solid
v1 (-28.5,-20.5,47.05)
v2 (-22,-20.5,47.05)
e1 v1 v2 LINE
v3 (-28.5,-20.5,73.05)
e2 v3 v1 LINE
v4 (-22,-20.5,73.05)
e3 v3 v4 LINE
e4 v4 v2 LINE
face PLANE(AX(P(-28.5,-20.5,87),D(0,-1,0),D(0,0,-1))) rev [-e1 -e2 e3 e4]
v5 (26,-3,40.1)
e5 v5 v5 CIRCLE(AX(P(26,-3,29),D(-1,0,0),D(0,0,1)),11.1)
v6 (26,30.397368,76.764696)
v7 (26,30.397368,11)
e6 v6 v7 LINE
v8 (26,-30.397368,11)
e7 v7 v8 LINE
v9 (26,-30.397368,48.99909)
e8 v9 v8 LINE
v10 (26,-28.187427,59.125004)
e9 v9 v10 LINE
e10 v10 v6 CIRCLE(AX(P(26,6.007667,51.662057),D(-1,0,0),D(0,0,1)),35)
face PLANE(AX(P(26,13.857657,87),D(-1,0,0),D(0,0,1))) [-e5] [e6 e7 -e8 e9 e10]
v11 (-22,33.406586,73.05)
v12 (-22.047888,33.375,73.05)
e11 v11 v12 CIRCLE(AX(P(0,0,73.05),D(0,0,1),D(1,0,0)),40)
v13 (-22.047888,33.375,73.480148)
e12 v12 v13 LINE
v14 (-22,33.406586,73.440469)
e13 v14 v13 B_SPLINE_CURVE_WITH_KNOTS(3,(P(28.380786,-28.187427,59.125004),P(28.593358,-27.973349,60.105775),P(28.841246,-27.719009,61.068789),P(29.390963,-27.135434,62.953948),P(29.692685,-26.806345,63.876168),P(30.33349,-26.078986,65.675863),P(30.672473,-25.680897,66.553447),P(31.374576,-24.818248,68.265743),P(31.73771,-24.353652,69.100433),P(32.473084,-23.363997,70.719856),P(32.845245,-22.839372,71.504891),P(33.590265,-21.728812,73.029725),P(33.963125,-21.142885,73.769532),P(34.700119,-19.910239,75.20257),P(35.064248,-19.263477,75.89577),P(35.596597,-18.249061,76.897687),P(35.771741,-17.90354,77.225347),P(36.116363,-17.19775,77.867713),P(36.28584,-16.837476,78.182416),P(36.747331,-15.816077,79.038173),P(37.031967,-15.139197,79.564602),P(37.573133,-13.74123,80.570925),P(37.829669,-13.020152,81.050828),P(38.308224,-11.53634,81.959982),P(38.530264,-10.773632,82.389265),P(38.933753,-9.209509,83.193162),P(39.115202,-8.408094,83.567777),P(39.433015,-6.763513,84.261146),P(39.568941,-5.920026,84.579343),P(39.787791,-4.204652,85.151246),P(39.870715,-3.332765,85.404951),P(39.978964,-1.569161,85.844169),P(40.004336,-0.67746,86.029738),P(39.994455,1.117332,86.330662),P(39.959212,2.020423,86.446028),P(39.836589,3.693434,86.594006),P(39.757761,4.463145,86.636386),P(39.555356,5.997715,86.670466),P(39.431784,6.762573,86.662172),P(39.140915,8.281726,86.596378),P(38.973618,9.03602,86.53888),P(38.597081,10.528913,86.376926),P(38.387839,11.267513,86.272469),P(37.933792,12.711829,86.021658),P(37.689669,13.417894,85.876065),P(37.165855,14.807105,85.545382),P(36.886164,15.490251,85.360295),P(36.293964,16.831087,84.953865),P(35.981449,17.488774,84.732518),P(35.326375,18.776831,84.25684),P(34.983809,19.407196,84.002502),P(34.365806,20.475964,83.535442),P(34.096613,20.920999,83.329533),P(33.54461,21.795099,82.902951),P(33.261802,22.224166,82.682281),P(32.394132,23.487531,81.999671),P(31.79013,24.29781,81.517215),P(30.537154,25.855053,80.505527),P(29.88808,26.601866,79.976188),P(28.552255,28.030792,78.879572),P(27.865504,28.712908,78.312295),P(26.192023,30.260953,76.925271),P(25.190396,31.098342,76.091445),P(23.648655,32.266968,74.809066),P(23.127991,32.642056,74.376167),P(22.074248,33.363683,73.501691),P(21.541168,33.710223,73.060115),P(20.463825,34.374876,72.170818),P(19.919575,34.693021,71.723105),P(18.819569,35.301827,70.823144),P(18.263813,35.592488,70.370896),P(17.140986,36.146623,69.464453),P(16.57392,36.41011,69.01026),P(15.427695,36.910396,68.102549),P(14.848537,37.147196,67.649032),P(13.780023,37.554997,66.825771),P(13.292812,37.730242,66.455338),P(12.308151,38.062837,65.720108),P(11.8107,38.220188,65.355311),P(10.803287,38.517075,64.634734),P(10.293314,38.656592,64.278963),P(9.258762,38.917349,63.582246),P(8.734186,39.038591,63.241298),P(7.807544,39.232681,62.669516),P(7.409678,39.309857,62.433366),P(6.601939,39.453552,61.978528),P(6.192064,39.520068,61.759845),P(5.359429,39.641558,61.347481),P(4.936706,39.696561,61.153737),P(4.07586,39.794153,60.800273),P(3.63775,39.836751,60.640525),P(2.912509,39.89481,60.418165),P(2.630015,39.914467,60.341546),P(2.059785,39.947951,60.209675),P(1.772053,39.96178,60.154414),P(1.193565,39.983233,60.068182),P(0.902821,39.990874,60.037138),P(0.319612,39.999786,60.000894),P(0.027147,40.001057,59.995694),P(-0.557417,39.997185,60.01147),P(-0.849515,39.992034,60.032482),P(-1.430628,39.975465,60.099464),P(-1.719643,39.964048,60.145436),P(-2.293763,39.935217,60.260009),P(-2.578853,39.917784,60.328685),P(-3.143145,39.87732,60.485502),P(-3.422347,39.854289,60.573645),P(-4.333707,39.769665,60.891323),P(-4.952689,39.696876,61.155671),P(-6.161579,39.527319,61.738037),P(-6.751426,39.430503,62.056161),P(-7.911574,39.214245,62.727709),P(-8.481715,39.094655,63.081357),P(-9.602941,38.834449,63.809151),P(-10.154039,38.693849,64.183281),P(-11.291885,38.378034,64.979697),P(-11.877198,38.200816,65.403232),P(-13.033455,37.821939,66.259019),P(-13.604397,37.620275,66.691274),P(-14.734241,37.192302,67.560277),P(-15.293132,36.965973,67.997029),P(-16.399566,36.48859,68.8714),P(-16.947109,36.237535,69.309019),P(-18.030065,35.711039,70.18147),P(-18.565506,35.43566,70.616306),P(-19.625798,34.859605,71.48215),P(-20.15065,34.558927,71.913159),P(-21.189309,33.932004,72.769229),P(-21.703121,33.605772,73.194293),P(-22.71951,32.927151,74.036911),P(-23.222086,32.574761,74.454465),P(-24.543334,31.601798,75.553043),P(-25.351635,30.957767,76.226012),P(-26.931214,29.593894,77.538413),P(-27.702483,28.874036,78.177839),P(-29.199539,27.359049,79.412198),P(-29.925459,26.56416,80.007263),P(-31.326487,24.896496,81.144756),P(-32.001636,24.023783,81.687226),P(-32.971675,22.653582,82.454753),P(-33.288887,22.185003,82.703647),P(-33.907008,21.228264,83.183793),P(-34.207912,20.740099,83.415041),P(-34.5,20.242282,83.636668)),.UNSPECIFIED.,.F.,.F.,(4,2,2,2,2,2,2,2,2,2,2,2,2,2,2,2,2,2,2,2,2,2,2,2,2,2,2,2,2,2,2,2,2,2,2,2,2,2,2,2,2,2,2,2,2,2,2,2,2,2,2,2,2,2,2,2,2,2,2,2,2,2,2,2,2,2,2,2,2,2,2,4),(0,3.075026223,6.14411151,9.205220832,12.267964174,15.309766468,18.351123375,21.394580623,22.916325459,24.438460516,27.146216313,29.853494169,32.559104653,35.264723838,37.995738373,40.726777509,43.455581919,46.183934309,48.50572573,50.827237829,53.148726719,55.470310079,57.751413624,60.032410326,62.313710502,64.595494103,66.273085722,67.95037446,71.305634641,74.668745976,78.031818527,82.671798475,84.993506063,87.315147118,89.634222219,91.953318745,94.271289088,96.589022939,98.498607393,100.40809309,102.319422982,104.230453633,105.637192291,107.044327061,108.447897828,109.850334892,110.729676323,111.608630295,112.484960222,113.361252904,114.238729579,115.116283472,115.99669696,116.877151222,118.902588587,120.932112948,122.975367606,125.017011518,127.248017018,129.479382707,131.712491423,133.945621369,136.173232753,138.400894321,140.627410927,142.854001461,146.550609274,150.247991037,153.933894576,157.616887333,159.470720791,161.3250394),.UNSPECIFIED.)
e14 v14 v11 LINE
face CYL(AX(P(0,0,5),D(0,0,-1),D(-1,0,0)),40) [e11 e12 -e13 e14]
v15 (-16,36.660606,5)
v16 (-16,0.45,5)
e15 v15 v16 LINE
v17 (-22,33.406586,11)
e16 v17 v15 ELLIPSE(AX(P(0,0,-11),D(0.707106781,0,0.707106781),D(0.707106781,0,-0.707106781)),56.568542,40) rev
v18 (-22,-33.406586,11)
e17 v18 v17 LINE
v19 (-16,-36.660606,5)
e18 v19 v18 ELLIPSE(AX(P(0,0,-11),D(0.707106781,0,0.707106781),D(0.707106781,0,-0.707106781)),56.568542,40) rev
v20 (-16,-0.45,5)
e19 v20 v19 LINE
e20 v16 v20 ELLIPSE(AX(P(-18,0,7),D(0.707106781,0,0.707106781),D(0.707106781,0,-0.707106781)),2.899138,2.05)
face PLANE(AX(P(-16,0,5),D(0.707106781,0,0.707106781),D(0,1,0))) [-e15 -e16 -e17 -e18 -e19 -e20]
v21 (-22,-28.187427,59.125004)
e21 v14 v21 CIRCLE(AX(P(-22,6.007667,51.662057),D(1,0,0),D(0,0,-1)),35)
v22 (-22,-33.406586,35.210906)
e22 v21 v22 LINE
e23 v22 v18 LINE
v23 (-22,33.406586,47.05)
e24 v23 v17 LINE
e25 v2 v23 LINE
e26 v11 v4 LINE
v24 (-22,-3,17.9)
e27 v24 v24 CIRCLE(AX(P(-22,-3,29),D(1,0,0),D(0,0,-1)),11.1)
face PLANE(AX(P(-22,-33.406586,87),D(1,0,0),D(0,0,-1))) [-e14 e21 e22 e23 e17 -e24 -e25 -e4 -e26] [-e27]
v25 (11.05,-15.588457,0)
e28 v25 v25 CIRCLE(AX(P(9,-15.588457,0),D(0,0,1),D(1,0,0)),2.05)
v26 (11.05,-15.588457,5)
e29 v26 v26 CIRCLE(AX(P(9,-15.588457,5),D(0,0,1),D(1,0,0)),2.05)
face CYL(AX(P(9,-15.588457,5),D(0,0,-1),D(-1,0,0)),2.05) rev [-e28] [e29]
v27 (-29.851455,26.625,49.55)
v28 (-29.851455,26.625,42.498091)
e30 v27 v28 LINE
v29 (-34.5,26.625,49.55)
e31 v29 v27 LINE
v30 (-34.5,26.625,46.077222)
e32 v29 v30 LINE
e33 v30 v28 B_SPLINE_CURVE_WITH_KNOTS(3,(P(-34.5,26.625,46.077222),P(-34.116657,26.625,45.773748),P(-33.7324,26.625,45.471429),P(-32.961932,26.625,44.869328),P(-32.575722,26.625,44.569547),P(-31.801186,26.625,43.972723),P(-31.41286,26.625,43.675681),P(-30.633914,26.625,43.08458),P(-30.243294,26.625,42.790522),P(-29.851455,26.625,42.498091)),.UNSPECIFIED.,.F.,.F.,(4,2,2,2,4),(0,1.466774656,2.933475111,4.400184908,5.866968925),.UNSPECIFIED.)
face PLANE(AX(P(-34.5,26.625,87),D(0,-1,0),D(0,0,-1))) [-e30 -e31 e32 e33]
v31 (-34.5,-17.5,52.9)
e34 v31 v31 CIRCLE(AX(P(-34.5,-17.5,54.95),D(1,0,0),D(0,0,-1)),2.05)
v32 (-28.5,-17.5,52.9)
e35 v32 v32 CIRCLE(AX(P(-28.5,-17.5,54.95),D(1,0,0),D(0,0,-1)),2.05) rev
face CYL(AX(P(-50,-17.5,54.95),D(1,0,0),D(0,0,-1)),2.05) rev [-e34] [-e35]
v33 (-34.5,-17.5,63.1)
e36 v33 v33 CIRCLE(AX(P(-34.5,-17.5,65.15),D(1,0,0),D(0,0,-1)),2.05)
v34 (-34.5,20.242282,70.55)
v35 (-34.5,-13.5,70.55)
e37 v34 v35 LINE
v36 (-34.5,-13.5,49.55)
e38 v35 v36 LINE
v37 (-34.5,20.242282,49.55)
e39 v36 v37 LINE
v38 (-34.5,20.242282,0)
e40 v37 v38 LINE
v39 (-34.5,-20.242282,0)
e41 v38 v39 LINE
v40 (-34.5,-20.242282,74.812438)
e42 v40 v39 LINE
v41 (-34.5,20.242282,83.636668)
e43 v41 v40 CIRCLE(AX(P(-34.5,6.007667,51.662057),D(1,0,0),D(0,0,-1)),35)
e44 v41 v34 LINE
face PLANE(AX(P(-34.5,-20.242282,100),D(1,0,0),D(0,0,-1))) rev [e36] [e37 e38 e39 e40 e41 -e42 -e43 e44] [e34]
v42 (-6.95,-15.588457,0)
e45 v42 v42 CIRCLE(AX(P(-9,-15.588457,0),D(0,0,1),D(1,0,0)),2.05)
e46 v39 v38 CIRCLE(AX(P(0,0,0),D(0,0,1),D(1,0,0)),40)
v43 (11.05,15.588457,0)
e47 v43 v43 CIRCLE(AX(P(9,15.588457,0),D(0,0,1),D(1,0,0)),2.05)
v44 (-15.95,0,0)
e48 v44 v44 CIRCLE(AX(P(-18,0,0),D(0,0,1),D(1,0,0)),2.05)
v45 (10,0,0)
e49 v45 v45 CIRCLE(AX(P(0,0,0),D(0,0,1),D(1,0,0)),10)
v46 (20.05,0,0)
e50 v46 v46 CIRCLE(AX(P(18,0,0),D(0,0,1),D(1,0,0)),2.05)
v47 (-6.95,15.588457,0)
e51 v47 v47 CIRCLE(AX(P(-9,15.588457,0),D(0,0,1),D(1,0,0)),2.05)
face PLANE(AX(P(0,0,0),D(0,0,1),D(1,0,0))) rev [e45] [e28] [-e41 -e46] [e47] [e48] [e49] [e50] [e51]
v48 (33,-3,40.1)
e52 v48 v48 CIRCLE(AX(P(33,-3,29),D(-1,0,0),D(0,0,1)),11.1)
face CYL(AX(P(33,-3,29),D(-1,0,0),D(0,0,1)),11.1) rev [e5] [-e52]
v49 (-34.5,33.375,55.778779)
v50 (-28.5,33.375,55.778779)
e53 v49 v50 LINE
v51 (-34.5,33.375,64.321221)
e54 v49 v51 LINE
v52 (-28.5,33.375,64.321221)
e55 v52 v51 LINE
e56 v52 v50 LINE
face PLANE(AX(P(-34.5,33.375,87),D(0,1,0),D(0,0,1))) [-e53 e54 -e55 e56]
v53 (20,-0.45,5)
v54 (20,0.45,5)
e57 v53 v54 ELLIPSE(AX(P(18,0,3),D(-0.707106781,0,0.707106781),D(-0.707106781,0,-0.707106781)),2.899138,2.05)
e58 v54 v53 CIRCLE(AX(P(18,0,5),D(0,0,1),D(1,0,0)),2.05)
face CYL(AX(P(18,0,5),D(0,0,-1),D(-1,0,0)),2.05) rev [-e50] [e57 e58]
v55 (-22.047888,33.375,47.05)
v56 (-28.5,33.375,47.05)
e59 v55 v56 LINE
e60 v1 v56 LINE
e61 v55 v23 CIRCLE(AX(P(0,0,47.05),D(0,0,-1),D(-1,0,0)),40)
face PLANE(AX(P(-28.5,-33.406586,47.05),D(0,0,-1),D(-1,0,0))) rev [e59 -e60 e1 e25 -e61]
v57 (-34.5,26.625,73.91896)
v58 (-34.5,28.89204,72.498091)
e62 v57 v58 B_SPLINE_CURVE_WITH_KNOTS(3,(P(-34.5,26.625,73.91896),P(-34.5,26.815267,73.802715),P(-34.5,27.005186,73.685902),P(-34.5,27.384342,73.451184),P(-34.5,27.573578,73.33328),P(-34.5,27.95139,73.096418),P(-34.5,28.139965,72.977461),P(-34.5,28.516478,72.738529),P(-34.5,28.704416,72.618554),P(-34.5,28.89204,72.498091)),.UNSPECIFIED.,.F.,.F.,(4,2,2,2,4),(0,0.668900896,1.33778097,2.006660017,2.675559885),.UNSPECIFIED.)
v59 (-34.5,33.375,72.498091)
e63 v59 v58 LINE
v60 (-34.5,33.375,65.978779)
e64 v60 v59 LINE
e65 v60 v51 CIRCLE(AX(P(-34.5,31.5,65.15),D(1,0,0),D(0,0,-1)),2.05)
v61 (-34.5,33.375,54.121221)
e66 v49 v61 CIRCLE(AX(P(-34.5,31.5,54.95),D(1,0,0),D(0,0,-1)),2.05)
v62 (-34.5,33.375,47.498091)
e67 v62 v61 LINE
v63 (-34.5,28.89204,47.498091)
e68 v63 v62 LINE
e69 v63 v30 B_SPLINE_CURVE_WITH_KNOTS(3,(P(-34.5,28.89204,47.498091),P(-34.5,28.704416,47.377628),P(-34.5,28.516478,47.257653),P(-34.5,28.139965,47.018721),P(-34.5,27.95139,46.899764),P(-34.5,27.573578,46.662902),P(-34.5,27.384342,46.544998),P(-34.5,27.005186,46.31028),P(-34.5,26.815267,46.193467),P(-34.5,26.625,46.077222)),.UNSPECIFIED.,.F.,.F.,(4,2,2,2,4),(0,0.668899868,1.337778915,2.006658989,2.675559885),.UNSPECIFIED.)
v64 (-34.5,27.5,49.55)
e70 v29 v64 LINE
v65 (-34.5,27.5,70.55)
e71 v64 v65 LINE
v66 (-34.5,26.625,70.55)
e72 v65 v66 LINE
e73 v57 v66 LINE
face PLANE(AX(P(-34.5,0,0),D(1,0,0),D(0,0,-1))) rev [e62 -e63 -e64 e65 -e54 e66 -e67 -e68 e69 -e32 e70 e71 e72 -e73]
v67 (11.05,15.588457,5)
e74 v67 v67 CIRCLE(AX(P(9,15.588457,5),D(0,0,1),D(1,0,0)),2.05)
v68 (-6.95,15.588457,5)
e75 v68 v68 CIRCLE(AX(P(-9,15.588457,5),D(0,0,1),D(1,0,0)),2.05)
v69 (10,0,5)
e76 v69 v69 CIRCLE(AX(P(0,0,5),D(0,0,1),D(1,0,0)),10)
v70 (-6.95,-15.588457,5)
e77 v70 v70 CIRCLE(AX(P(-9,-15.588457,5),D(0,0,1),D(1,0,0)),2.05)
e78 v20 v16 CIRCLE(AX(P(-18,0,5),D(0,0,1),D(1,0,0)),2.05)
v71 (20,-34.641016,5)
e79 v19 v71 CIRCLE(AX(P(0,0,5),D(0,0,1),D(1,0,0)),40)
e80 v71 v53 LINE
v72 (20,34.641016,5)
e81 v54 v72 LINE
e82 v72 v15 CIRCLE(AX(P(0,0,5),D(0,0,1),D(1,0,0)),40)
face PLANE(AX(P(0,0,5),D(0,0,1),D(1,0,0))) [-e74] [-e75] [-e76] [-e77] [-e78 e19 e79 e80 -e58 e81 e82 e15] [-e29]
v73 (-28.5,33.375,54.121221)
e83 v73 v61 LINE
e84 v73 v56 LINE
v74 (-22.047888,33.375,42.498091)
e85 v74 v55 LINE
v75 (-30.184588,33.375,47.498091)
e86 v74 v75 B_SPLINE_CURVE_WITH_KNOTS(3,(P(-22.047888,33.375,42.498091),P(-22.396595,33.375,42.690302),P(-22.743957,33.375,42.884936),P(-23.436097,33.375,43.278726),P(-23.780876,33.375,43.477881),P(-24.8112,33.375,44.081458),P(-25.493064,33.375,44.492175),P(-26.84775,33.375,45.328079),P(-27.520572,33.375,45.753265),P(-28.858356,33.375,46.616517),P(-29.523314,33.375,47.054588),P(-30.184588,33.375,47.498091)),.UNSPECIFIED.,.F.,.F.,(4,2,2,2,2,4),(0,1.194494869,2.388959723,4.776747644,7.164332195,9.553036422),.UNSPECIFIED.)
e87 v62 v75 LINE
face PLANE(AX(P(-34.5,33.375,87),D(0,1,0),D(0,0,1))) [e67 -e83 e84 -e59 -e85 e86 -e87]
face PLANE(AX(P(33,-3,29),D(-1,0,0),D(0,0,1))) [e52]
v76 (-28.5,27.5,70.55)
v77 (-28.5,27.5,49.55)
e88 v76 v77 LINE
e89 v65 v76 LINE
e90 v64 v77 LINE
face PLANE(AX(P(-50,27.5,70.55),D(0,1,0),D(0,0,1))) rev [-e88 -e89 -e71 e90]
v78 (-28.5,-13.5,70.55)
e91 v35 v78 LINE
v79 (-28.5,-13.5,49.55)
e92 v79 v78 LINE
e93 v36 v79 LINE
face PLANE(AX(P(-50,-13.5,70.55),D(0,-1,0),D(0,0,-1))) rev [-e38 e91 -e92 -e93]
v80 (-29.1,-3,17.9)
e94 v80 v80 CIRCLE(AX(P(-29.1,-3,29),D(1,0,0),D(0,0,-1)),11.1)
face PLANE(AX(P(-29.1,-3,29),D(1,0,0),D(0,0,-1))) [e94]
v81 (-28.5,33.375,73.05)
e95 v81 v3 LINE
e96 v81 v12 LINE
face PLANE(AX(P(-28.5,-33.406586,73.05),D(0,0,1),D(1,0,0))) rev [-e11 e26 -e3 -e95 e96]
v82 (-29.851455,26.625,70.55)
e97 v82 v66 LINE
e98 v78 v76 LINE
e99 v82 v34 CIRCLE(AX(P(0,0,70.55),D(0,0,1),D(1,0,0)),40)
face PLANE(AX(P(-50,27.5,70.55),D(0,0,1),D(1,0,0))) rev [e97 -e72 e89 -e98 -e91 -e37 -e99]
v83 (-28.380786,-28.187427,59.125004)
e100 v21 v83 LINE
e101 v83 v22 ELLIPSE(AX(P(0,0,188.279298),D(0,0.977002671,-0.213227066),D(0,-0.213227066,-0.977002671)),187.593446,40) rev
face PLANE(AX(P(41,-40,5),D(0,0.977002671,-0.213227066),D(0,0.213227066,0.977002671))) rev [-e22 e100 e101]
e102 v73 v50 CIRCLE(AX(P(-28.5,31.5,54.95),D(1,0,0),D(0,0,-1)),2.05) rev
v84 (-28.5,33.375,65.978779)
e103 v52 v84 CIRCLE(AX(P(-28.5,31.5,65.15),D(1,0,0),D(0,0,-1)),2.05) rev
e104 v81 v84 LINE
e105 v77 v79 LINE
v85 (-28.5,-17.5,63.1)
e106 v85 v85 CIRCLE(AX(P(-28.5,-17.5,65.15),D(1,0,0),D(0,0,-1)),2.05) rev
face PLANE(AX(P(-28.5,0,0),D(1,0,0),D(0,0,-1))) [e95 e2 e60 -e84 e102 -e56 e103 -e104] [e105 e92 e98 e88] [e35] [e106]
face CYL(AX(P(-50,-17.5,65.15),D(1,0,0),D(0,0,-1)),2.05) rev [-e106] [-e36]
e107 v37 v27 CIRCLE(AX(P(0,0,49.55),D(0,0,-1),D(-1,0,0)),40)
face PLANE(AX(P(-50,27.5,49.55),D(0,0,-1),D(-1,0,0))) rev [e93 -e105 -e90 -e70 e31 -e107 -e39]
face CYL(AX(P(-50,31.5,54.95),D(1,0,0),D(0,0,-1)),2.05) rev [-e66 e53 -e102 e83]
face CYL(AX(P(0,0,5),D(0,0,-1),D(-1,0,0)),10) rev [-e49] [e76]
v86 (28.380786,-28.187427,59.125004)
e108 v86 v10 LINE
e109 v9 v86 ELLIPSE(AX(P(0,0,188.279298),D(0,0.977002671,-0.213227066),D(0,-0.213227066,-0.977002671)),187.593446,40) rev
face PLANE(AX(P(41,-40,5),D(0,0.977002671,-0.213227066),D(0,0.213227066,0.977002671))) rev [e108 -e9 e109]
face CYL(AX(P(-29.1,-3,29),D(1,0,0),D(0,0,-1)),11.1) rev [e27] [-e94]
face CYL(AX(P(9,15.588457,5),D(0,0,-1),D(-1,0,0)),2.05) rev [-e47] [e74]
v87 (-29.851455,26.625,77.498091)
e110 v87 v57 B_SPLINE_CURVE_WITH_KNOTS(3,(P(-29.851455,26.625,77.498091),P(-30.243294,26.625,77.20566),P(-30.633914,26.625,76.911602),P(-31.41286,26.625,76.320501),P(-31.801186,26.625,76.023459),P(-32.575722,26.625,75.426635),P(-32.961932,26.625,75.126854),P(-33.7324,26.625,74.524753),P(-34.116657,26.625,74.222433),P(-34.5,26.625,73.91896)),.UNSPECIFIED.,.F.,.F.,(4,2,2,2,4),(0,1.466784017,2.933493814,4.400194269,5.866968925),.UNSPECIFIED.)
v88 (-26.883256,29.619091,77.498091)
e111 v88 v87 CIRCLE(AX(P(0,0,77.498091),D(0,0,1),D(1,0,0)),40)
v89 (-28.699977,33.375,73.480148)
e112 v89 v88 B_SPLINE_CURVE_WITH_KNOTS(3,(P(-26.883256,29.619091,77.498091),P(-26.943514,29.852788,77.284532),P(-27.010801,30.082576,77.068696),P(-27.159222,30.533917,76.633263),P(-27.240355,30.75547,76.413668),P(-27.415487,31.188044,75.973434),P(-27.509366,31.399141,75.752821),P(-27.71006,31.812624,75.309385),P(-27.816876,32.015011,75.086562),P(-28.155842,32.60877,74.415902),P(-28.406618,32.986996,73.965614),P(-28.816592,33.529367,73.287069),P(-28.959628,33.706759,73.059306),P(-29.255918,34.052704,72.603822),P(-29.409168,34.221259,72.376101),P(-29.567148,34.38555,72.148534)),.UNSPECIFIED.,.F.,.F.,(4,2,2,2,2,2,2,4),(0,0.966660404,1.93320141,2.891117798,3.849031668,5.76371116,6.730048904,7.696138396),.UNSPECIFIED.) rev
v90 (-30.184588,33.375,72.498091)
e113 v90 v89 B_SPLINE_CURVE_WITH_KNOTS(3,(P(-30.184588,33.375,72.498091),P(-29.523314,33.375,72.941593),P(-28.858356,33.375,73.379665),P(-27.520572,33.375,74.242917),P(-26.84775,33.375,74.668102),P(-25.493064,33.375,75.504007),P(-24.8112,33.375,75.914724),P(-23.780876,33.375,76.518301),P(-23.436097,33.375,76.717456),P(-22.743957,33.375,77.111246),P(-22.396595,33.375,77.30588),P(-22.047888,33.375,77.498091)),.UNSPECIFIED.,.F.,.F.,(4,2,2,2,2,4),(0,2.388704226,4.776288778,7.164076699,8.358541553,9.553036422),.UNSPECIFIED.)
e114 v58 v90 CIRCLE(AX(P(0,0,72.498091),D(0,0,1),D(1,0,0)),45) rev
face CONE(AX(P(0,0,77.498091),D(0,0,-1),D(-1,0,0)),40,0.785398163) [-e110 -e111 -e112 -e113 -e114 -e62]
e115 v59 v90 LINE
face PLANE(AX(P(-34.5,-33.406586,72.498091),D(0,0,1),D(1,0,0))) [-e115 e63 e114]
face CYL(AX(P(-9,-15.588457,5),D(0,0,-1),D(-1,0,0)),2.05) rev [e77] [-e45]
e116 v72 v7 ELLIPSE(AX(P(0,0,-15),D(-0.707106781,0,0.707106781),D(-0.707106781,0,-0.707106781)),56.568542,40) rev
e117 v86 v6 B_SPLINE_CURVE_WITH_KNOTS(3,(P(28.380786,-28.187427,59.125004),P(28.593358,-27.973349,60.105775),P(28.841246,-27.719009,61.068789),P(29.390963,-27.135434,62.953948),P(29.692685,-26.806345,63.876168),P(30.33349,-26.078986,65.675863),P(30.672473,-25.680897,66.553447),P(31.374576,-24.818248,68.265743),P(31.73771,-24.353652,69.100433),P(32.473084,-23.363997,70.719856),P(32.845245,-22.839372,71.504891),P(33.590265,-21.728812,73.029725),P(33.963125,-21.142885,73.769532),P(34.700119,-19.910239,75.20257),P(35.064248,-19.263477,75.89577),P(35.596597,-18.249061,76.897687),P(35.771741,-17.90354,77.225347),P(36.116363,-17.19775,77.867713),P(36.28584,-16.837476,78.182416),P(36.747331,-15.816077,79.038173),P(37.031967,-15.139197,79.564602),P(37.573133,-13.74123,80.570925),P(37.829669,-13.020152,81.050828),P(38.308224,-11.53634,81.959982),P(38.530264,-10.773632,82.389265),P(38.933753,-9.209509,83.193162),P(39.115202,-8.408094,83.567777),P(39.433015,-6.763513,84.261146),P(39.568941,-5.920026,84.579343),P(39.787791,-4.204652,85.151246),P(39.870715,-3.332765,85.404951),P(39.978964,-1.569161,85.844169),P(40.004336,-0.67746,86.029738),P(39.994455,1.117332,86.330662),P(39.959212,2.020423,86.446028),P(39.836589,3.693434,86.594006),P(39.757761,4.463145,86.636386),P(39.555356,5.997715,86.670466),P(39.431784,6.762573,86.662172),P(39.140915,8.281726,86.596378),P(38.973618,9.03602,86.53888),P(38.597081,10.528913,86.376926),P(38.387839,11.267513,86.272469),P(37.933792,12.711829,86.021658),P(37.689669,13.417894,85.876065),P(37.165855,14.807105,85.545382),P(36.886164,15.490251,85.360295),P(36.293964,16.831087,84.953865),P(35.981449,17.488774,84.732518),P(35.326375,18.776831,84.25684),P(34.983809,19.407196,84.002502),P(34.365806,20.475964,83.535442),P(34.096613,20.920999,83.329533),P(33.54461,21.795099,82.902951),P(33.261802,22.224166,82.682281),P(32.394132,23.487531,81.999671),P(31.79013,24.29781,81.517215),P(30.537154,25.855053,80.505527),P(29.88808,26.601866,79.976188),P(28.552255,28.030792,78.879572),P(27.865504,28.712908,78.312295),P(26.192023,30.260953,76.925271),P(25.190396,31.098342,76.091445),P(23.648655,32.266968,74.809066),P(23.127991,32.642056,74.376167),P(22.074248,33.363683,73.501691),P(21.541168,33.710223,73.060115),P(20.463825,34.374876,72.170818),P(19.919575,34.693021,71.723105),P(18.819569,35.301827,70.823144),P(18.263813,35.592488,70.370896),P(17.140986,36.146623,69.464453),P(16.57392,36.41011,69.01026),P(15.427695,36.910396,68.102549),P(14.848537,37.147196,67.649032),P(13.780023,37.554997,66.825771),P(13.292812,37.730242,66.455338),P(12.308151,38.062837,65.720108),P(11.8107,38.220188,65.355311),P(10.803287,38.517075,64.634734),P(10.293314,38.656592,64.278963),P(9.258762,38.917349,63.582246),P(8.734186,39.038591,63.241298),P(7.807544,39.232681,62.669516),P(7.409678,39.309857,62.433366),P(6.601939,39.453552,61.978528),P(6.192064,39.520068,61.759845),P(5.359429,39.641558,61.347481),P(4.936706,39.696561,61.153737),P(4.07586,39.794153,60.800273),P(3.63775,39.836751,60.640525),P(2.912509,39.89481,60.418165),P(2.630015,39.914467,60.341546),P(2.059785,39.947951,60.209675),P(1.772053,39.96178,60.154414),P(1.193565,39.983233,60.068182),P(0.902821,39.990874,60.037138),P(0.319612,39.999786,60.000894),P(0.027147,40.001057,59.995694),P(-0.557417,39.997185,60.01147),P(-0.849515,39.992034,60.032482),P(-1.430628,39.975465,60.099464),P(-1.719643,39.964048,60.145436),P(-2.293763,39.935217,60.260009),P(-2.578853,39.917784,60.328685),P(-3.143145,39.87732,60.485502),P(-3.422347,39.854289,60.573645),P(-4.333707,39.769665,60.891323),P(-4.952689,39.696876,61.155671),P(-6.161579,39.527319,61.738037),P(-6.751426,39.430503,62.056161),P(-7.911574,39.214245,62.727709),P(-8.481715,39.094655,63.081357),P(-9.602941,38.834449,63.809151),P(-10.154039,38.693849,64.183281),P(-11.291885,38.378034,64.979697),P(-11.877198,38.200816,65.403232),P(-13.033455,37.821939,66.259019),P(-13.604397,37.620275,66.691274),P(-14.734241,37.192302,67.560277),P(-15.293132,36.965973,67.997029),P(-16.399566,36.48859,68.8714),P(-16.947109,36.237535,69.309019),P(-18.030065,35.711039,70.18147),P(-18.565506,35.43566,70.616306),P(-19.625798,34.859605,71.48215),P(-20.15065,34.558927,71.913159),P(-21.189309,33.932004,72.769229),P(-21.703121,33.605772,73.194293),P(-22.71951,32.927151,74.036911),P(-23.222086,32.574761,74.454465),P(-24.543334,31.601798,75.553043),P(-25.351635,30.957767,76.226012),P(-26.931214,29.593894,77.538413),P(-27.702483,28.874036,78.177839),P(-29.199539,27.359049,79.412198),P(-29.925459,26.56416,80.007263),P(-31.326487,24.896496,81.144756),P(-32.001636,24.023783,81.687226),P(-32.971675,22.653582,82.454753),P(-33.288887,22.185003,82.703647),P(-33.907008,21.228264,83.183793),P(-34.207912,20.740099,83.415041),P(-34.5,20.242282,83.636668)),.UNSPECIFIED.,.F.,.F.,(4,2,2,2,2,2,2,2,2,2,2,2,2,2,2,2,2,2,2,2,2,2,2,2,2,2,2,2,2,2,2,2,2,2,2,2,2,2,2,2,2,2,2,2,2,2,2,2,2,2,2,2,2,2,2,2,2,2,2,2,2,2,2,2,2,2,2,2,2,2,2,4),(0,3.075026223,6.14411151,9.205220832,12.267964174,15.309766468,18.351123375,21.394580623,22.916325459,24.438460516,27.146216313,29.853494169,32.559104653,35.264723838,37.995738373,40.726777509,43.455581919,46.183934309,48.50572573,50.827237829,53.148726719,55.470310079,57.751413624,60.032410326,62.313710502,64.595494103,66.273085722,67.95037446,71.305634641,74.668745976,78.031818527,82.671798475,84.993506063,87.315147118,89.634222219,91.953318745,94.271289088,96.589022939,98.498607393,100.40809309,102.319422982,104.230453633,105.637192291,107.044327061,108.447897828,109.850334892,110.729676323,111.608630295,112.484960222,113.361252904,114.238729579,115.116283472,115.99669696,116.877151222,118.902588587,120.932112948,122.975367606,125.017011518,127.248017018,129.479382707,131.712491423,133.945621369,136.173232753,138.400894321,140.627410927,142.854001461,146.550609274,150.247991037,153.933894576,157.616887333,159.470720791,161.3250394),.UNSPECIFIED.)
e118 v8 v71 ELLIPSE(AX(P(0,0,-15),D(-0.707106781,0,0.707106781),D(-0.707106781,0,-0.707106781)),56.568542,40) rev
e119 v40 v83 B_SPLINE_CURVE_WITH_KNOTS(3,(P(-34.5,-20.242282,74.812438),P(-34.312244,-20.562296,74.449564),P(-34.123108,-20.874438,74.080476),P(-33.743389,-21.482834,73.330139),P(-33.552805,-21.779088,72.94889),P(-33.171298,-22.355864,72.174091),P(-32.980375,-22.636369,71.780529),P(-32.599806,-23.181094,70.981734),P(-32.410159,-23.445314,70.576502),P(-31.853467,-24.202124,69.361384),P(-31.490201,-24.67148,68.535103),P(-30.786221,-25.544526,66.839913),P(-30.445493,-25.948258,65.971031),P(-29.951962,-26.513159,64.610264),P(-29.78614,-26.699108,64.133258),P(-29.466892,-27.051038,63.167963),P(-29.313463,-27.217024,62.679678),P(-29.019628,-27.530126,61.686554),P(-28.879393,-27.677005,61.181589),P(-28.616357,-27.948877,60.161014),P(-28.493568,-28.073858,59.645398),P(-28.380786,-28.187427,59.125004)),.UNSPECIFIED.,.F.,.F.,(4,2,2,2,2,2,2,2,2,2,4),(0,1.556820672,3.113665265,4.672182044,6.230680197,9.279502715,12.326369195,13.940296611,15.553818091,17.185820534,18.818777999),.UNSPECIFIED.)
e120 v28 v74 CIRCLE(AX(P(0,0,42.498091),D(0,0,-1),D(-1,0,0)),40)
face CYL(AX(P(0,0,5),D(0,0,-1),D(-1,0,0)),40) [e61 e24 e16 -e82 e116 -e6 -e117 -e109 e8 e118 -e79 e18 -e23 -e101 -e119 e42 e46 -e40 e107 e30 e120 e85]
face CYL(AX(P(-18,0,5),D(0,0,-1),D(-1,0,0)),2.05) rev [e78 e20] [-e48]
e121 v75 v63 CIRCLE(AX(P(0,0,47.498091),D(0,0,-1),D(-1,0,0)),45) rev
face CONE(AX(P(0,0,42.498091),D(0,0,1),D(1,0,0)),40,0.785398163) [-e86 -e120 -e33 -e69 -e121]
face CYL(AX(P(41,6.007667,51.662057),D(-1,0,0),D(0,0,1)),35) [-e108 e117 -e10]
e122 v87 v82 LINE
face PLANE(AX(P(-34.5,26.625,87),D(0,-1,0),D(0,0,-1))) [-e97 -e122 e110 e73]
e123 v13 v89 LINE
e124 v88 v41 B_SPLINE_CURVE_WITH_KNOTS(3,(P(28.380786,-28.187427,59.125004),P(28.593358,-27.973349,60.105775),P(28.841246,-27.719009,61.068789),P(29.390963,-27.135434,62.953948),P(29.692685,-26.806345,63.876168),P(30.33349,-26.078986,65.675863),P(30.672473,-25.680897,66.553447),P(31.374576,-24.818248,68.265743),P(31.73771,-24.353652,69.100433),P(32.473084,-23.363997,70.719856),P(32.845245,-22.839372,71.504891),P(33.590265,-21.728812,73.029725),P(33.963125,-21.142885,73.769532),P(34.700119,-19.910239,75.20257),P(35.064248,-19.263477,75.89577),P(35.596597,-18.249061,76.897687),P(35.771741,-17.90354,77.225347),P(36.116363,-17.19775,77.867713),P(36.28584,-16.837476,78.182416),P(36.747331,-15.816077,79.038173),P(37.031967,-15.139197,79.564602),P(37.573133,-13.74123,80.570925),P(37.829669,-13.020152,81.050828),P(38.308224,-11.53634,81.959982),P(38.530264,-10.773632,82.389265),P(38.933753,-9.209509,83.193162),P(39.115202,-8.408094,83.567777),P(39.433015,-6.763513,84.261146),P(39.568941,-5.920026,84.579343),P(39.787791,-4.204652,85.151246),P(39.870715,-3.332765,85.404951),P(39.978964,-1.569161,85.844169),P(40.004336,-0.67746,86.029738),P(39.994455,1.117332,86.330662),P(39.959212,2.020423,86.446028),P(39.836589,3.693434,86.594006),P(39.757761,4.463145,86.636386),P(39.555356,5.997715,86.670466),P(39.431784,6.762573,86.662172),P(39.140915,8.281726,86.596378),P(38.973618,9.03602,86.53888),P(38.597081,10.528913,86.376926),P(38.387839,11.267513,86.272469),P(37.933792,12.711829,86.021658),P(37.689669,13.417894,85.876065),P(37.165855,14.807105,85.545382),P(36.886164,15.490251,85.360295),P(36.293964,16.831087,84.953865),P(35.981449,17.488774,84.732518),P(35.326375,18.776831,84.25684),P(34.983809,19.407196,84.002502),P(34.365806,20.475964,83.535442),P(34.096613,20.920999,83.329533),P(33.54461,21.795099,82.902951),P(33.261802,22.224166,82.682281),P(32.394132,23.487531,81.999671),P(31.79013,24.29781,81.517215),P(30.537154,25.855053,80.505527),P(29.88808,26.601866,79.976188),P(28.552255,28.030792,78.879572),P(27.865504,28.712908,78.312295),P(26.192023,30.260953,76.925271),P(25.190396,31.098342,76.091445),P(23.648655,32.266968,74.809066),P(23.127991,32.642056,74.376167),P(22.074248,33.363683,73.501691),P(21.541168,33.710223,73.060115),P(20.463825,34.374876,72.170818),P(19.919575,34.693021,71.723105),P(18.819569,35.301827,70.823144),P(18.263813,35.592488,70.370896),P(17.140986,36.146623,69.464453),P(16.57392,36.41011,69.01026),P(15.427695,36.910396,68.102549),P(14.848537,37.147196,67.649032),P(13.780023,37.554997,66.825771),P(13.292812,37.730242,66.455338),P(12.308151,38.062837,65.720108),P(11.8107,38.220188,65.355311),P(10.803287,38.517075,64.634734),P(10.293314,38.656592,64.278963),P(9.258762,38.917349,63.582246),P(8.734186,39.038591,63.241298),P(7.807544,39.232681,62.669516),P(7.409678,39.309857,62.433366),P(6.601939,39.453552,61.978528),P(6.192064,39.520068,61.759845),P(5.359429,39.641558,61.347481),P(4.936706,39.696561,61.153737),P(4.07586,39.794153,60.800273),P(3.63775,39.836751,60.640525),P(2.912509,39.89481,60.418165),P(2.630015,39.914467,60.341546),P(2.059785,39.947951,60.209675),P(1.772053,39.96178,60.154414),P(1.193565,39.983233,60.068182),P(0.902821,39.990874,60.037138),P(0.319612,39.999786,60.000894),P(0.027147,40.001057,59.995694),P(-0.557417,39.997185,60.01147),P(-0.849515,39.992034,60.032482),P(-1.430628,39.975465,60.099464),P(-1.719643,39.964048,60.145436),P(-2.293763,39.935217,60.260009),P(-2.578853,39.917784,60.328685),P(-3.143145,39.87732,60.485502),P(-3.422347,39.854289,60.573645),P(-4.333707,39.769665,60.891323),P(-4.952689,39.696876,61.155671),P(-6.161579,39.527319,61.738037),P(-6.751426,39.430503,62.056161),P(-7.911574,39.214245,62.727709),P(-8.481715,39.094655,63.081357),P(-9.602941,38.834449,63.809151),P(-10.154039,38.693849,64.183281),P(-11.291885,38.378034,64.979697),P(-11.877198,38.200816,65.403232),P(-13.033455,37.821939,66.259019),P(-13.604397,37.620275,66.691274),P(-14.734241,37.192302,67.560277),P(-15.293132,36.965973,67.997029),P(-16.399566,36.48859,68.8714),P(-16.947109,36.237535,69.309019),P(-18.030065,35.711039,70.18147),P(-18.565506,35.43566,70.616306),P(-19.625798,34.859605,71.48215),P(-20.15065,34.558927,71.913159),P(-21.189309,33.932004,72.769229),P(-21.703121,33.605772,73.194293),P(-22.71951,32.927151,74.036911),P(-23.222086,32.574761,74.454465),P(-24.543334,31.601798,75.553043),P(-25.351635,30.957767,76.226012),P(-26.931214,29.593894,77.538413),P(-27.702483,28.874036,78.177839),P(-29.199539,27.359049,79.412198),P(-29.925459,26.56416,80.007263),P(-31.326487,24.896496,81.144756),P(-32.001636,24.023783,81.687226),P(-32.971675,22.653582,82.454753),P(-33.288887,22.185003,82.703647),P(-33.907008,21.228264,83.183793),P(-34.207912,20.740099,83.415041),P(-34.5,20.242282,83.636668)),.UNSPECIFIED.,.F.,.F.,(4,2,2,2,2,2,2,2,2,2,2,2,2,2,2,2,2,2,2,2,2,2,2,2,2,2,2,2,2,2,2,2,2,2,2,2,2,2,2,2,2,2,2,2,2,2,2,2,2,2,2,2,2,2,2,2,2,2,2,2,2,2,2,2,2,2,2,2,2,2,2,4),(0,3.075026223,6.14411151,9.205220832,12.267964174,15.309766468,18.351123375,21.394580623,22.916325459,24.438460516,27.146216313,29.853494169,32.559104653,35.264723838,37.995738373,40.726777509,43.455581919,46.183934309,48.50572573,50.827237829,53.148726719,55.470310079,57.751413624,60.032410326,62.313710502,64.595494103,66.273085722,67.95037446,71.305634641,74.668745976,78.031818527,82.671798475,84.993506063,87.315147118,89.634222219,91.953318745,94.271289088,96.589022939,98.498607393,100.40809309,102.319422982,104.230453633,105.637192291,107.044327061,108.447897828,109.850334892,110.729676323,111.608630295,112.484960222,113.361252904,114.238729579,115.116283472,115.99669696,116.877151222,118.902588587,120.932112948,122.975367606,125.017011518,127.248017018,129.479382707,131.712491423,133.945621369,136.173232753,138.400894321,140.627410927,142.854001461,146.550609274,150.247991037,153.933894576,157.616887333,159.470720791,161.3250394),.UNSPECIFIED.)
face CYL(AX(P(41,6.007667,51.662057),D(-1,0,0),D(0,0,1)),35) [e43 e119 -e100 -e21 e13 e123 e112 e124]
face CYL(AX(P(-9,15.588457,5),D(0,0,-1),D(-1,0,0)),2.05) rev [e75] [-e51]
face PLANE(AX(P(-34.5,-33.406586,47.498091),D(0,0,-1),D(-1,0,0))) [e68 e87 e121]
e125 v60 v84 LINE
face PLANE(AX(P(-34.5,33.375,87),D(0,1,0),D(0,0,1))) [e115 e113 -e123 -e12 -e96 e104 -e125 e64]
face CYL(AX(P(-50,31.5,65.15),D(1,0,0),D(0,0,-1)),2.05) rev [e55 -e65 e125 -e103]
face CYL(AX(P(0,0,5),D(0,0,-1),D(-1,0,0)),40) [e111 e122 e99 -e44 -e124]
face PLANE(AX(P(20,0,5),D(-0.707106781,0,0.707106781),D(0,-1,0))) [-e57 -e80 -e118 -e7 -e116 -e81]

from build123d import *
from build123d.topology import SkipClean

# Parameters (mm, degrees)
SKETCH3_R           = 40
SKETCH3_R_2         = 2.05
SKETCH3_R_3         = 10
BOSS_EXTRUDE1_DEPTH = 5
BOSS_EXTRUDE2_DEPTH = 41
SKETCH5_W           = 112.43258682
SKETCH5_H           = 89.925085182
CUT_EXTRUDE1_DEPTH  = 100
CUT_EXTRUDE2_START  = 5
CUT_EXTRUDE2_DEPTH  = 82
CUT_EXTRUDE3_START  = -22
SKETCH7_R           = 11.1
CUT_EXTRUDE3_DEPTH  = 7.1
BOSS_EXTRUDE3_START = -22
SKETCH9_W           = 6.75
SKETCH9_H           = 25
BOSS_EXTRUDE3_DEPTH = 12.5
SKETCH8_R           = 2.05
SKETCH8_W           = 41
SKETCH8_H           = 21
CUT_EXTRUDE5_DEPTH  = 50
CHAMFER1_SIZE       = 5
CHAMFER2_SIZE       = 6
CUT_EXTRUDE6_START  = 33
SKETCH10_R          = 11.1
CUT_EXTRUDE6_DEPTH  = 7
CUT_EXTRUDE7_START  = -22
SKETCH11_W          = 55
SKETCH11_H          = 26
CUT_EXTRUDE7_DEPTH  = 6.5


with BuildPart() as part:
    # Sketch3 → Boss-Extrude1 (new body)
    with BuildSketch(Plane(origin=(0, 0, 0), x_dir=(0, 1, 0), z_dir=(0, 0, 1))):
        with Locations(Location((0, 0, 0), (0, 0, 270))):
            Circle(SKETCH3_R)
        with Locations(Location((0, 18, 0), (0, 0, 270))):
            Circle(SKETCH3_R_2, mode=Mode.SUBTRACT)
        with Locations(Location((15.588457268, 9, 0), (0, 0, 270))):
            Circle(SKETCH3_R_2, mode=Mode.SUBTRACT)
        with Locations(Location((15.588457268, -9, 0), (0, 0, 270))):
            Circle(SKETCH3_R_2, mode=Mode.SUBTRACT)
        with Locations(Location((0, -18, 0), (0, 0, 270))):
            Circle(SKETCH3_R_2, mode=Mode.SUBTRACT)
        with Locations(Location((-15.588457268, -9, 0), (0, 0, 270))):
            Circle(SKETCH3_R_2, mode=Mode.SUBTRACT)
        with Locations(Location((-15.588457268, 9, 0), (0, 0, 270))):
            Circle(SKETCH3_R_2, mode=Mode.SUBTRACT)
        with Locations(Location((0, 0, 0), (0, 0, 270))):
            Circle(SKETCH3_R_3, mode=Mode.SUBTRACT)
    extrude(amount=BOSS_EXTRUDE1_DEPTH)

    # Sketch4 → Boss-Extrude2 (add, symmetric)
    with BuildSketch(Plane.YZ):
        with BuildLine():
            Line((-40, 5), (-28.187426516, 59.125004254))
            ThreePointArc((-28.187426516, 59.125004254), (5.55857639, 86.659175658), (40, 60))
            Line((40, 60), (40, 5))
            Line((40, 5), (-40, 5))
        make_face()
    extrude(amount=BOSS_EXTRUDE2_DEPTH, both=True)

    # Sketch5 → Cut-Extrude1 (cut)
    with SkipClean():  # the faces are left unmerged after this step: merging them gives an invalid solid
        with BuildSketch(Plane(origin=(0, 0, 0), x_dir=(0, 1, 0), z_dir=(0, 0, 1))):
            Rectangle(SKETCH5_W, SKETCH5_H)
            with BuildLine():
                Line((-20.24228248, 34.5), (20.24228248, 34.5))
                ThreePointArc((20.24228248, 34.5), (0, -40), (-20.24228248, 34.5))
            make_face(mode=Mode.SUBTRACT)
        extrude(amount=CUT_EXTRUDE1_DEPTH, mode=Mode.SUBTRACT)
    add(part.part.scale(1), mode=Mode.REPLACE)  # the faces are merged on a copy

    # Sketch6 → Cut-Extrude2 (cut)
    with BuildSketch(Plane(origin=(0, 0, 0), x_dir=(0, 1, 0), z_dir=(0, 0, 1)).offset(CUT_EXTRUDE2_START)):
        with BuildLine():
            Line((-13.85765721, -26), (13.85765721, -26))
            Line((13.85765721, -26), (30.397368307, -26))
            ThreePointArc((30.397368307, -26), (39.921625117, -2.502768077), (33.406586177, 22))
            Line((33.406586177, 22), (-33.406586177, 22))
            ThreePointArc((-33.406586177, 22), (-39.921625117, -2.502768077), (-30.397368307, -26))
            Line((-30.397368307, -26), (-13.85765721, -26))
        make_face()
        with BuildLine():
            Line((-20.24228248, 34.5), (20.24228248, 34.5))
            ThreePointArc((20.24228248, 34.5), (0, 40), (-20.24228248, 34.5))
        make_face()
    extrude(amount=CUT_EXTRUDE2_DEPTH, mode=Mode.SUBTRACT)

    # Sketch7 → Cut-Extrude3 (cut)
    with BuildSketch(Plane.YZ.offset(CUT_EXTRUDE3_START)):
        with Locations(Location((-3, 29, 0), (0, 0, 270))):
            Circle(SKETCH7_R)
    extrude(amount=-CUT_EXTRUDE3_DEPTH, mode=Mode.SUBTRACT)

    # Sketch9 → Boss-Extrude3 (add)
    with BuildSketch(Plane.YZ.offset(BOSS_EXTRUDE3_START)):
        with Locations((30, 59.998090913)):
            Rectangle(SKETCH9_W, SKETCH9_H)
    extrude(amount=-BOSS_EXTRUDE3_DEPTH)

    # Sketch8 → Cut-Extrude5 (cut)
    with BuildSketch(Plane.YZ):
        with Locations(Location((-17.5, 65.15, 0), (0, 0, 270))):
            Circle(SKETCH8_R)
        with Locations(Location((-17.5, 54.95, 0), (0, 0, 270))):
            Circle(SKETCH8_R)
        with Locations((31.5, 54.95)):
            Circle(SKETCH8_R)
        with Locations((31.5, 65.15)):
            Circle(SKETCH8_R)
        with Locations((7, 60.05)):
            Rectangle(SKETCH8_W, SKETCH8_H)
    extrude(amount=-CUT_EXTRUDE5_DEPTH, mode=Mode.SUBTRACT)

    # Chamfer1
    # the kernel refuses this chamfer: 5 mm, written as the material it adds along each edge
    with BuildSketch(Plane(origin=(0, 0, 72.498090913), x_dir=(-0.9183651186253444, 0.39573413915437844, 0), z_dir=(-0.39573413915437844, -0.9183651186253444, 0))) as chamfer1_piece_1_section:
        Polygon((40, -CHAMFER1_SIZE), (40 + CHAMFER1_SIZE, 0), (40, 0), align=None)
    chamfer1_piece_1 = revolve(axis=Axis((0, 0, 72.498090913), (0, 0, -1)), revolution_arc=51.657569858, mode=Mode.PRIVATE)
    chamfer1_piece_1 = split(chamfer1_piece_1, bisect_by=Plane(origin=(-34.5, 29.836622418, 73.971077773), z_dir=(1, 0, 0)), keep=Keep.TOP, mode=Mode.PRIVATE)
    chamfer1_piece_1 = split(chamfer1_piece_1, bisect_by=Plane(origin=(-22, 29.836622418, 73.971077773), z_dir=(-1, 0, 0)), keep=Keep.TOP, mode=Mode.PRIVATE)
    chamfer1_piece_1 = chamfer1_piece_1 & Plane(origin=(-28.977022362, 6.007666956, 51.662056953), x_dir=(0, -0.9770026706356161, 0.21322706575590716), z_dir=(1, 0, 0)) * Cylinder(35, 180, mode=Mode.PRIVATE)
    chamfer1_piece_1 = split(chamfer1_piece_1, bisect_by=Plane(origin=(-28.977022362, 33.375, 73.971077773), z_dir=(0, -1, 0)), keep=Keep.TOP, mode=Mode.PRIVATE)
    chamfer1_piece_1 = split(chamfer1_piece_1, bisect_by=Plane(origin=(-28.977022362, 26.625, 73.971077773), z_dir=(0, 1, 0)), keep=Keep.TOP, mode=Mode.PRIVATE)
    add(chamfer1_piece_1)
    with BuildSketch(Plane(origin=(0, 0, 47.498090913), x_dir=(-0.9183651186253442, 0.39573413915437894, 0), z_dir=(-0.39573413915437894, -0.9183651186253442, 0))) as chamfer1_piece_2_section:
        Polygon((40, CHAMFER1_SIZE), (40 + CHAMFER1_SIZE, 0), (40, 0), align=None)
    chamfer1_piece_2 = revolve(axis=Axis((0, 0, 47.498090913), (0, 0, -1)), revolution_arc=51.657569858, mode=Mode.PRIVATE)
    chamfer1_piece_2 = split(chamfer1_piece_2, bisect_by=Plane(origin=(-34.5, 30.172032739, 45.811526919), z_dir=(1, 0, 0)), keep=Keep.TOP, mode=Mode.PRIVATE)
    chamfer1_piece_2 = split(chamfer1_piece_2, bisect_by=Plane(origin=(-28.439026237, 26.625, 45.811526919), z_dir=(0, 1, 0)), keep=Keep.TOP, mode=Mode.PRIVATE)
    chamfer1_piece_2 = split(chamfer1_piece_2, bisect_by=Plane(origin=(-28.439026237, 33.375, 45.811526919), z_dir=(0, -1, 0)), keep=Keep.TOP, mode=Mode.PRIVATE)
    chamfer1_piece_2 = split(chamfer1_piece_2, bisect_by=Plane(origin=(-22, 30.172032739, 45.811526919), z_dir=(-1, 0, 0)), keep=Keep.TOP, mode=Mode.PRIVATE)
    add(chamfer1_piece_2)

    # Chamfer2
    # the kernel refuses this chamfer: 6 mm, written as the material it adds along each edge
    with BuildSketch(Plane(origin=(26, -45.827466235, 5), x_dir=(-0.9996219169112969, 0, -0.027495876610586355), z_dir=(0, 1, 0))) as chamfer2_piece_1_section:
        Polygon((CHAMFER2_SIZE * 0.999621916911, CHAMFER2_SIZE * 0.0274958766106), (-CHAMFER2_SIZE * 0.0274958766106, CHAMFER2_SIZE * 0.999621916911), (0, 0), align=None)
    chamfer2_piece_1 = extrude(amount=91.65493247, mode=Mode.PRIVATE)
    chamfer2_piece_1 = chamfer2_piece_1 & Plane(origin=(0, 0, 6.950735371), x_dir=(1, 0, 0), z_dir=(0, 0, -1)) * Cylinder(40, 208, mode=Mode.PRIVATE)
    chamfer2_piece_1 = chamfer2_piece_1 - Plane(origin=(18, 0, 6.950735371), x_dir=(1, 0, 0), z_dir=(0, 0, -1)) * Cylinder(2.05, 208, mode=Mode.PRIVATE)
    add(chamfer2_piece_1)
    with BuildSketch(Plane(origin=(-22, 48.836684105, 5), x_dir=(0.9996219169112969, 0, -0.027495876610586348), z_dir=(0, -1, 0))) as chamfer2_piece_2_section:
        Polygon((CHAMFER2_SIZE * 0.999621916911, CHAMFER2_SIZE * 0.0274958766106), (-CHAMFER2_SIZE * 0.0274958766106, CHAMFER2_SIZE * 0.999621916911), (0, 0), align=None)
    chamfer2_piece_2 = extrude(amount=97.67336821, mode=Mode.PRIVATE)
    chamfer2_piece_2 = chamfer2_piece_2 & Plane(origin=(0, 0, 5.808875482), x_dir=(1, 0, 0), z_dir=(0, 0, -1)) * Cylinder(40, 220, mode=Mode.PRIVATE)
    chamfer2_piece_2 = chamfer2_piece_2 - Plane(origin=(-18, 0, 5.808875482), x_dir=(1, 0, 0), z_dir=(0, 0, -1)) * Cylinder(2.05, 220, mode=Mode.PRIVATE)
    add(chamfer2_piece_2)

    # Sketch10 → Cut-Extrude6 (cut)
    with BuildSketch(Plane.YZ.offset(CUT_EXTRUDE6_START)):
        with Locations(Location((-3, 29, 0), (0, 0, 270))):
            Circle(SKETCH10_R)
    extrude(amount=-CUT_EXTRUDE6_DEPTH, mode=Mode.SUBTRACT)

    # Sketch11 → Cut-Extrude7 (cut)
    with BuildSketch(Plane.YZ.offset(CUT_EXTRUDE7_START)):
        with Locations((7, 60.05)):
            Rectangle(SKETCH11_W, SKETCH11_H)
    extrude(amount=-CUT_EXTRUDE7_DEPTH, mode=Mode.SUBTRACT)


solid = part.part
